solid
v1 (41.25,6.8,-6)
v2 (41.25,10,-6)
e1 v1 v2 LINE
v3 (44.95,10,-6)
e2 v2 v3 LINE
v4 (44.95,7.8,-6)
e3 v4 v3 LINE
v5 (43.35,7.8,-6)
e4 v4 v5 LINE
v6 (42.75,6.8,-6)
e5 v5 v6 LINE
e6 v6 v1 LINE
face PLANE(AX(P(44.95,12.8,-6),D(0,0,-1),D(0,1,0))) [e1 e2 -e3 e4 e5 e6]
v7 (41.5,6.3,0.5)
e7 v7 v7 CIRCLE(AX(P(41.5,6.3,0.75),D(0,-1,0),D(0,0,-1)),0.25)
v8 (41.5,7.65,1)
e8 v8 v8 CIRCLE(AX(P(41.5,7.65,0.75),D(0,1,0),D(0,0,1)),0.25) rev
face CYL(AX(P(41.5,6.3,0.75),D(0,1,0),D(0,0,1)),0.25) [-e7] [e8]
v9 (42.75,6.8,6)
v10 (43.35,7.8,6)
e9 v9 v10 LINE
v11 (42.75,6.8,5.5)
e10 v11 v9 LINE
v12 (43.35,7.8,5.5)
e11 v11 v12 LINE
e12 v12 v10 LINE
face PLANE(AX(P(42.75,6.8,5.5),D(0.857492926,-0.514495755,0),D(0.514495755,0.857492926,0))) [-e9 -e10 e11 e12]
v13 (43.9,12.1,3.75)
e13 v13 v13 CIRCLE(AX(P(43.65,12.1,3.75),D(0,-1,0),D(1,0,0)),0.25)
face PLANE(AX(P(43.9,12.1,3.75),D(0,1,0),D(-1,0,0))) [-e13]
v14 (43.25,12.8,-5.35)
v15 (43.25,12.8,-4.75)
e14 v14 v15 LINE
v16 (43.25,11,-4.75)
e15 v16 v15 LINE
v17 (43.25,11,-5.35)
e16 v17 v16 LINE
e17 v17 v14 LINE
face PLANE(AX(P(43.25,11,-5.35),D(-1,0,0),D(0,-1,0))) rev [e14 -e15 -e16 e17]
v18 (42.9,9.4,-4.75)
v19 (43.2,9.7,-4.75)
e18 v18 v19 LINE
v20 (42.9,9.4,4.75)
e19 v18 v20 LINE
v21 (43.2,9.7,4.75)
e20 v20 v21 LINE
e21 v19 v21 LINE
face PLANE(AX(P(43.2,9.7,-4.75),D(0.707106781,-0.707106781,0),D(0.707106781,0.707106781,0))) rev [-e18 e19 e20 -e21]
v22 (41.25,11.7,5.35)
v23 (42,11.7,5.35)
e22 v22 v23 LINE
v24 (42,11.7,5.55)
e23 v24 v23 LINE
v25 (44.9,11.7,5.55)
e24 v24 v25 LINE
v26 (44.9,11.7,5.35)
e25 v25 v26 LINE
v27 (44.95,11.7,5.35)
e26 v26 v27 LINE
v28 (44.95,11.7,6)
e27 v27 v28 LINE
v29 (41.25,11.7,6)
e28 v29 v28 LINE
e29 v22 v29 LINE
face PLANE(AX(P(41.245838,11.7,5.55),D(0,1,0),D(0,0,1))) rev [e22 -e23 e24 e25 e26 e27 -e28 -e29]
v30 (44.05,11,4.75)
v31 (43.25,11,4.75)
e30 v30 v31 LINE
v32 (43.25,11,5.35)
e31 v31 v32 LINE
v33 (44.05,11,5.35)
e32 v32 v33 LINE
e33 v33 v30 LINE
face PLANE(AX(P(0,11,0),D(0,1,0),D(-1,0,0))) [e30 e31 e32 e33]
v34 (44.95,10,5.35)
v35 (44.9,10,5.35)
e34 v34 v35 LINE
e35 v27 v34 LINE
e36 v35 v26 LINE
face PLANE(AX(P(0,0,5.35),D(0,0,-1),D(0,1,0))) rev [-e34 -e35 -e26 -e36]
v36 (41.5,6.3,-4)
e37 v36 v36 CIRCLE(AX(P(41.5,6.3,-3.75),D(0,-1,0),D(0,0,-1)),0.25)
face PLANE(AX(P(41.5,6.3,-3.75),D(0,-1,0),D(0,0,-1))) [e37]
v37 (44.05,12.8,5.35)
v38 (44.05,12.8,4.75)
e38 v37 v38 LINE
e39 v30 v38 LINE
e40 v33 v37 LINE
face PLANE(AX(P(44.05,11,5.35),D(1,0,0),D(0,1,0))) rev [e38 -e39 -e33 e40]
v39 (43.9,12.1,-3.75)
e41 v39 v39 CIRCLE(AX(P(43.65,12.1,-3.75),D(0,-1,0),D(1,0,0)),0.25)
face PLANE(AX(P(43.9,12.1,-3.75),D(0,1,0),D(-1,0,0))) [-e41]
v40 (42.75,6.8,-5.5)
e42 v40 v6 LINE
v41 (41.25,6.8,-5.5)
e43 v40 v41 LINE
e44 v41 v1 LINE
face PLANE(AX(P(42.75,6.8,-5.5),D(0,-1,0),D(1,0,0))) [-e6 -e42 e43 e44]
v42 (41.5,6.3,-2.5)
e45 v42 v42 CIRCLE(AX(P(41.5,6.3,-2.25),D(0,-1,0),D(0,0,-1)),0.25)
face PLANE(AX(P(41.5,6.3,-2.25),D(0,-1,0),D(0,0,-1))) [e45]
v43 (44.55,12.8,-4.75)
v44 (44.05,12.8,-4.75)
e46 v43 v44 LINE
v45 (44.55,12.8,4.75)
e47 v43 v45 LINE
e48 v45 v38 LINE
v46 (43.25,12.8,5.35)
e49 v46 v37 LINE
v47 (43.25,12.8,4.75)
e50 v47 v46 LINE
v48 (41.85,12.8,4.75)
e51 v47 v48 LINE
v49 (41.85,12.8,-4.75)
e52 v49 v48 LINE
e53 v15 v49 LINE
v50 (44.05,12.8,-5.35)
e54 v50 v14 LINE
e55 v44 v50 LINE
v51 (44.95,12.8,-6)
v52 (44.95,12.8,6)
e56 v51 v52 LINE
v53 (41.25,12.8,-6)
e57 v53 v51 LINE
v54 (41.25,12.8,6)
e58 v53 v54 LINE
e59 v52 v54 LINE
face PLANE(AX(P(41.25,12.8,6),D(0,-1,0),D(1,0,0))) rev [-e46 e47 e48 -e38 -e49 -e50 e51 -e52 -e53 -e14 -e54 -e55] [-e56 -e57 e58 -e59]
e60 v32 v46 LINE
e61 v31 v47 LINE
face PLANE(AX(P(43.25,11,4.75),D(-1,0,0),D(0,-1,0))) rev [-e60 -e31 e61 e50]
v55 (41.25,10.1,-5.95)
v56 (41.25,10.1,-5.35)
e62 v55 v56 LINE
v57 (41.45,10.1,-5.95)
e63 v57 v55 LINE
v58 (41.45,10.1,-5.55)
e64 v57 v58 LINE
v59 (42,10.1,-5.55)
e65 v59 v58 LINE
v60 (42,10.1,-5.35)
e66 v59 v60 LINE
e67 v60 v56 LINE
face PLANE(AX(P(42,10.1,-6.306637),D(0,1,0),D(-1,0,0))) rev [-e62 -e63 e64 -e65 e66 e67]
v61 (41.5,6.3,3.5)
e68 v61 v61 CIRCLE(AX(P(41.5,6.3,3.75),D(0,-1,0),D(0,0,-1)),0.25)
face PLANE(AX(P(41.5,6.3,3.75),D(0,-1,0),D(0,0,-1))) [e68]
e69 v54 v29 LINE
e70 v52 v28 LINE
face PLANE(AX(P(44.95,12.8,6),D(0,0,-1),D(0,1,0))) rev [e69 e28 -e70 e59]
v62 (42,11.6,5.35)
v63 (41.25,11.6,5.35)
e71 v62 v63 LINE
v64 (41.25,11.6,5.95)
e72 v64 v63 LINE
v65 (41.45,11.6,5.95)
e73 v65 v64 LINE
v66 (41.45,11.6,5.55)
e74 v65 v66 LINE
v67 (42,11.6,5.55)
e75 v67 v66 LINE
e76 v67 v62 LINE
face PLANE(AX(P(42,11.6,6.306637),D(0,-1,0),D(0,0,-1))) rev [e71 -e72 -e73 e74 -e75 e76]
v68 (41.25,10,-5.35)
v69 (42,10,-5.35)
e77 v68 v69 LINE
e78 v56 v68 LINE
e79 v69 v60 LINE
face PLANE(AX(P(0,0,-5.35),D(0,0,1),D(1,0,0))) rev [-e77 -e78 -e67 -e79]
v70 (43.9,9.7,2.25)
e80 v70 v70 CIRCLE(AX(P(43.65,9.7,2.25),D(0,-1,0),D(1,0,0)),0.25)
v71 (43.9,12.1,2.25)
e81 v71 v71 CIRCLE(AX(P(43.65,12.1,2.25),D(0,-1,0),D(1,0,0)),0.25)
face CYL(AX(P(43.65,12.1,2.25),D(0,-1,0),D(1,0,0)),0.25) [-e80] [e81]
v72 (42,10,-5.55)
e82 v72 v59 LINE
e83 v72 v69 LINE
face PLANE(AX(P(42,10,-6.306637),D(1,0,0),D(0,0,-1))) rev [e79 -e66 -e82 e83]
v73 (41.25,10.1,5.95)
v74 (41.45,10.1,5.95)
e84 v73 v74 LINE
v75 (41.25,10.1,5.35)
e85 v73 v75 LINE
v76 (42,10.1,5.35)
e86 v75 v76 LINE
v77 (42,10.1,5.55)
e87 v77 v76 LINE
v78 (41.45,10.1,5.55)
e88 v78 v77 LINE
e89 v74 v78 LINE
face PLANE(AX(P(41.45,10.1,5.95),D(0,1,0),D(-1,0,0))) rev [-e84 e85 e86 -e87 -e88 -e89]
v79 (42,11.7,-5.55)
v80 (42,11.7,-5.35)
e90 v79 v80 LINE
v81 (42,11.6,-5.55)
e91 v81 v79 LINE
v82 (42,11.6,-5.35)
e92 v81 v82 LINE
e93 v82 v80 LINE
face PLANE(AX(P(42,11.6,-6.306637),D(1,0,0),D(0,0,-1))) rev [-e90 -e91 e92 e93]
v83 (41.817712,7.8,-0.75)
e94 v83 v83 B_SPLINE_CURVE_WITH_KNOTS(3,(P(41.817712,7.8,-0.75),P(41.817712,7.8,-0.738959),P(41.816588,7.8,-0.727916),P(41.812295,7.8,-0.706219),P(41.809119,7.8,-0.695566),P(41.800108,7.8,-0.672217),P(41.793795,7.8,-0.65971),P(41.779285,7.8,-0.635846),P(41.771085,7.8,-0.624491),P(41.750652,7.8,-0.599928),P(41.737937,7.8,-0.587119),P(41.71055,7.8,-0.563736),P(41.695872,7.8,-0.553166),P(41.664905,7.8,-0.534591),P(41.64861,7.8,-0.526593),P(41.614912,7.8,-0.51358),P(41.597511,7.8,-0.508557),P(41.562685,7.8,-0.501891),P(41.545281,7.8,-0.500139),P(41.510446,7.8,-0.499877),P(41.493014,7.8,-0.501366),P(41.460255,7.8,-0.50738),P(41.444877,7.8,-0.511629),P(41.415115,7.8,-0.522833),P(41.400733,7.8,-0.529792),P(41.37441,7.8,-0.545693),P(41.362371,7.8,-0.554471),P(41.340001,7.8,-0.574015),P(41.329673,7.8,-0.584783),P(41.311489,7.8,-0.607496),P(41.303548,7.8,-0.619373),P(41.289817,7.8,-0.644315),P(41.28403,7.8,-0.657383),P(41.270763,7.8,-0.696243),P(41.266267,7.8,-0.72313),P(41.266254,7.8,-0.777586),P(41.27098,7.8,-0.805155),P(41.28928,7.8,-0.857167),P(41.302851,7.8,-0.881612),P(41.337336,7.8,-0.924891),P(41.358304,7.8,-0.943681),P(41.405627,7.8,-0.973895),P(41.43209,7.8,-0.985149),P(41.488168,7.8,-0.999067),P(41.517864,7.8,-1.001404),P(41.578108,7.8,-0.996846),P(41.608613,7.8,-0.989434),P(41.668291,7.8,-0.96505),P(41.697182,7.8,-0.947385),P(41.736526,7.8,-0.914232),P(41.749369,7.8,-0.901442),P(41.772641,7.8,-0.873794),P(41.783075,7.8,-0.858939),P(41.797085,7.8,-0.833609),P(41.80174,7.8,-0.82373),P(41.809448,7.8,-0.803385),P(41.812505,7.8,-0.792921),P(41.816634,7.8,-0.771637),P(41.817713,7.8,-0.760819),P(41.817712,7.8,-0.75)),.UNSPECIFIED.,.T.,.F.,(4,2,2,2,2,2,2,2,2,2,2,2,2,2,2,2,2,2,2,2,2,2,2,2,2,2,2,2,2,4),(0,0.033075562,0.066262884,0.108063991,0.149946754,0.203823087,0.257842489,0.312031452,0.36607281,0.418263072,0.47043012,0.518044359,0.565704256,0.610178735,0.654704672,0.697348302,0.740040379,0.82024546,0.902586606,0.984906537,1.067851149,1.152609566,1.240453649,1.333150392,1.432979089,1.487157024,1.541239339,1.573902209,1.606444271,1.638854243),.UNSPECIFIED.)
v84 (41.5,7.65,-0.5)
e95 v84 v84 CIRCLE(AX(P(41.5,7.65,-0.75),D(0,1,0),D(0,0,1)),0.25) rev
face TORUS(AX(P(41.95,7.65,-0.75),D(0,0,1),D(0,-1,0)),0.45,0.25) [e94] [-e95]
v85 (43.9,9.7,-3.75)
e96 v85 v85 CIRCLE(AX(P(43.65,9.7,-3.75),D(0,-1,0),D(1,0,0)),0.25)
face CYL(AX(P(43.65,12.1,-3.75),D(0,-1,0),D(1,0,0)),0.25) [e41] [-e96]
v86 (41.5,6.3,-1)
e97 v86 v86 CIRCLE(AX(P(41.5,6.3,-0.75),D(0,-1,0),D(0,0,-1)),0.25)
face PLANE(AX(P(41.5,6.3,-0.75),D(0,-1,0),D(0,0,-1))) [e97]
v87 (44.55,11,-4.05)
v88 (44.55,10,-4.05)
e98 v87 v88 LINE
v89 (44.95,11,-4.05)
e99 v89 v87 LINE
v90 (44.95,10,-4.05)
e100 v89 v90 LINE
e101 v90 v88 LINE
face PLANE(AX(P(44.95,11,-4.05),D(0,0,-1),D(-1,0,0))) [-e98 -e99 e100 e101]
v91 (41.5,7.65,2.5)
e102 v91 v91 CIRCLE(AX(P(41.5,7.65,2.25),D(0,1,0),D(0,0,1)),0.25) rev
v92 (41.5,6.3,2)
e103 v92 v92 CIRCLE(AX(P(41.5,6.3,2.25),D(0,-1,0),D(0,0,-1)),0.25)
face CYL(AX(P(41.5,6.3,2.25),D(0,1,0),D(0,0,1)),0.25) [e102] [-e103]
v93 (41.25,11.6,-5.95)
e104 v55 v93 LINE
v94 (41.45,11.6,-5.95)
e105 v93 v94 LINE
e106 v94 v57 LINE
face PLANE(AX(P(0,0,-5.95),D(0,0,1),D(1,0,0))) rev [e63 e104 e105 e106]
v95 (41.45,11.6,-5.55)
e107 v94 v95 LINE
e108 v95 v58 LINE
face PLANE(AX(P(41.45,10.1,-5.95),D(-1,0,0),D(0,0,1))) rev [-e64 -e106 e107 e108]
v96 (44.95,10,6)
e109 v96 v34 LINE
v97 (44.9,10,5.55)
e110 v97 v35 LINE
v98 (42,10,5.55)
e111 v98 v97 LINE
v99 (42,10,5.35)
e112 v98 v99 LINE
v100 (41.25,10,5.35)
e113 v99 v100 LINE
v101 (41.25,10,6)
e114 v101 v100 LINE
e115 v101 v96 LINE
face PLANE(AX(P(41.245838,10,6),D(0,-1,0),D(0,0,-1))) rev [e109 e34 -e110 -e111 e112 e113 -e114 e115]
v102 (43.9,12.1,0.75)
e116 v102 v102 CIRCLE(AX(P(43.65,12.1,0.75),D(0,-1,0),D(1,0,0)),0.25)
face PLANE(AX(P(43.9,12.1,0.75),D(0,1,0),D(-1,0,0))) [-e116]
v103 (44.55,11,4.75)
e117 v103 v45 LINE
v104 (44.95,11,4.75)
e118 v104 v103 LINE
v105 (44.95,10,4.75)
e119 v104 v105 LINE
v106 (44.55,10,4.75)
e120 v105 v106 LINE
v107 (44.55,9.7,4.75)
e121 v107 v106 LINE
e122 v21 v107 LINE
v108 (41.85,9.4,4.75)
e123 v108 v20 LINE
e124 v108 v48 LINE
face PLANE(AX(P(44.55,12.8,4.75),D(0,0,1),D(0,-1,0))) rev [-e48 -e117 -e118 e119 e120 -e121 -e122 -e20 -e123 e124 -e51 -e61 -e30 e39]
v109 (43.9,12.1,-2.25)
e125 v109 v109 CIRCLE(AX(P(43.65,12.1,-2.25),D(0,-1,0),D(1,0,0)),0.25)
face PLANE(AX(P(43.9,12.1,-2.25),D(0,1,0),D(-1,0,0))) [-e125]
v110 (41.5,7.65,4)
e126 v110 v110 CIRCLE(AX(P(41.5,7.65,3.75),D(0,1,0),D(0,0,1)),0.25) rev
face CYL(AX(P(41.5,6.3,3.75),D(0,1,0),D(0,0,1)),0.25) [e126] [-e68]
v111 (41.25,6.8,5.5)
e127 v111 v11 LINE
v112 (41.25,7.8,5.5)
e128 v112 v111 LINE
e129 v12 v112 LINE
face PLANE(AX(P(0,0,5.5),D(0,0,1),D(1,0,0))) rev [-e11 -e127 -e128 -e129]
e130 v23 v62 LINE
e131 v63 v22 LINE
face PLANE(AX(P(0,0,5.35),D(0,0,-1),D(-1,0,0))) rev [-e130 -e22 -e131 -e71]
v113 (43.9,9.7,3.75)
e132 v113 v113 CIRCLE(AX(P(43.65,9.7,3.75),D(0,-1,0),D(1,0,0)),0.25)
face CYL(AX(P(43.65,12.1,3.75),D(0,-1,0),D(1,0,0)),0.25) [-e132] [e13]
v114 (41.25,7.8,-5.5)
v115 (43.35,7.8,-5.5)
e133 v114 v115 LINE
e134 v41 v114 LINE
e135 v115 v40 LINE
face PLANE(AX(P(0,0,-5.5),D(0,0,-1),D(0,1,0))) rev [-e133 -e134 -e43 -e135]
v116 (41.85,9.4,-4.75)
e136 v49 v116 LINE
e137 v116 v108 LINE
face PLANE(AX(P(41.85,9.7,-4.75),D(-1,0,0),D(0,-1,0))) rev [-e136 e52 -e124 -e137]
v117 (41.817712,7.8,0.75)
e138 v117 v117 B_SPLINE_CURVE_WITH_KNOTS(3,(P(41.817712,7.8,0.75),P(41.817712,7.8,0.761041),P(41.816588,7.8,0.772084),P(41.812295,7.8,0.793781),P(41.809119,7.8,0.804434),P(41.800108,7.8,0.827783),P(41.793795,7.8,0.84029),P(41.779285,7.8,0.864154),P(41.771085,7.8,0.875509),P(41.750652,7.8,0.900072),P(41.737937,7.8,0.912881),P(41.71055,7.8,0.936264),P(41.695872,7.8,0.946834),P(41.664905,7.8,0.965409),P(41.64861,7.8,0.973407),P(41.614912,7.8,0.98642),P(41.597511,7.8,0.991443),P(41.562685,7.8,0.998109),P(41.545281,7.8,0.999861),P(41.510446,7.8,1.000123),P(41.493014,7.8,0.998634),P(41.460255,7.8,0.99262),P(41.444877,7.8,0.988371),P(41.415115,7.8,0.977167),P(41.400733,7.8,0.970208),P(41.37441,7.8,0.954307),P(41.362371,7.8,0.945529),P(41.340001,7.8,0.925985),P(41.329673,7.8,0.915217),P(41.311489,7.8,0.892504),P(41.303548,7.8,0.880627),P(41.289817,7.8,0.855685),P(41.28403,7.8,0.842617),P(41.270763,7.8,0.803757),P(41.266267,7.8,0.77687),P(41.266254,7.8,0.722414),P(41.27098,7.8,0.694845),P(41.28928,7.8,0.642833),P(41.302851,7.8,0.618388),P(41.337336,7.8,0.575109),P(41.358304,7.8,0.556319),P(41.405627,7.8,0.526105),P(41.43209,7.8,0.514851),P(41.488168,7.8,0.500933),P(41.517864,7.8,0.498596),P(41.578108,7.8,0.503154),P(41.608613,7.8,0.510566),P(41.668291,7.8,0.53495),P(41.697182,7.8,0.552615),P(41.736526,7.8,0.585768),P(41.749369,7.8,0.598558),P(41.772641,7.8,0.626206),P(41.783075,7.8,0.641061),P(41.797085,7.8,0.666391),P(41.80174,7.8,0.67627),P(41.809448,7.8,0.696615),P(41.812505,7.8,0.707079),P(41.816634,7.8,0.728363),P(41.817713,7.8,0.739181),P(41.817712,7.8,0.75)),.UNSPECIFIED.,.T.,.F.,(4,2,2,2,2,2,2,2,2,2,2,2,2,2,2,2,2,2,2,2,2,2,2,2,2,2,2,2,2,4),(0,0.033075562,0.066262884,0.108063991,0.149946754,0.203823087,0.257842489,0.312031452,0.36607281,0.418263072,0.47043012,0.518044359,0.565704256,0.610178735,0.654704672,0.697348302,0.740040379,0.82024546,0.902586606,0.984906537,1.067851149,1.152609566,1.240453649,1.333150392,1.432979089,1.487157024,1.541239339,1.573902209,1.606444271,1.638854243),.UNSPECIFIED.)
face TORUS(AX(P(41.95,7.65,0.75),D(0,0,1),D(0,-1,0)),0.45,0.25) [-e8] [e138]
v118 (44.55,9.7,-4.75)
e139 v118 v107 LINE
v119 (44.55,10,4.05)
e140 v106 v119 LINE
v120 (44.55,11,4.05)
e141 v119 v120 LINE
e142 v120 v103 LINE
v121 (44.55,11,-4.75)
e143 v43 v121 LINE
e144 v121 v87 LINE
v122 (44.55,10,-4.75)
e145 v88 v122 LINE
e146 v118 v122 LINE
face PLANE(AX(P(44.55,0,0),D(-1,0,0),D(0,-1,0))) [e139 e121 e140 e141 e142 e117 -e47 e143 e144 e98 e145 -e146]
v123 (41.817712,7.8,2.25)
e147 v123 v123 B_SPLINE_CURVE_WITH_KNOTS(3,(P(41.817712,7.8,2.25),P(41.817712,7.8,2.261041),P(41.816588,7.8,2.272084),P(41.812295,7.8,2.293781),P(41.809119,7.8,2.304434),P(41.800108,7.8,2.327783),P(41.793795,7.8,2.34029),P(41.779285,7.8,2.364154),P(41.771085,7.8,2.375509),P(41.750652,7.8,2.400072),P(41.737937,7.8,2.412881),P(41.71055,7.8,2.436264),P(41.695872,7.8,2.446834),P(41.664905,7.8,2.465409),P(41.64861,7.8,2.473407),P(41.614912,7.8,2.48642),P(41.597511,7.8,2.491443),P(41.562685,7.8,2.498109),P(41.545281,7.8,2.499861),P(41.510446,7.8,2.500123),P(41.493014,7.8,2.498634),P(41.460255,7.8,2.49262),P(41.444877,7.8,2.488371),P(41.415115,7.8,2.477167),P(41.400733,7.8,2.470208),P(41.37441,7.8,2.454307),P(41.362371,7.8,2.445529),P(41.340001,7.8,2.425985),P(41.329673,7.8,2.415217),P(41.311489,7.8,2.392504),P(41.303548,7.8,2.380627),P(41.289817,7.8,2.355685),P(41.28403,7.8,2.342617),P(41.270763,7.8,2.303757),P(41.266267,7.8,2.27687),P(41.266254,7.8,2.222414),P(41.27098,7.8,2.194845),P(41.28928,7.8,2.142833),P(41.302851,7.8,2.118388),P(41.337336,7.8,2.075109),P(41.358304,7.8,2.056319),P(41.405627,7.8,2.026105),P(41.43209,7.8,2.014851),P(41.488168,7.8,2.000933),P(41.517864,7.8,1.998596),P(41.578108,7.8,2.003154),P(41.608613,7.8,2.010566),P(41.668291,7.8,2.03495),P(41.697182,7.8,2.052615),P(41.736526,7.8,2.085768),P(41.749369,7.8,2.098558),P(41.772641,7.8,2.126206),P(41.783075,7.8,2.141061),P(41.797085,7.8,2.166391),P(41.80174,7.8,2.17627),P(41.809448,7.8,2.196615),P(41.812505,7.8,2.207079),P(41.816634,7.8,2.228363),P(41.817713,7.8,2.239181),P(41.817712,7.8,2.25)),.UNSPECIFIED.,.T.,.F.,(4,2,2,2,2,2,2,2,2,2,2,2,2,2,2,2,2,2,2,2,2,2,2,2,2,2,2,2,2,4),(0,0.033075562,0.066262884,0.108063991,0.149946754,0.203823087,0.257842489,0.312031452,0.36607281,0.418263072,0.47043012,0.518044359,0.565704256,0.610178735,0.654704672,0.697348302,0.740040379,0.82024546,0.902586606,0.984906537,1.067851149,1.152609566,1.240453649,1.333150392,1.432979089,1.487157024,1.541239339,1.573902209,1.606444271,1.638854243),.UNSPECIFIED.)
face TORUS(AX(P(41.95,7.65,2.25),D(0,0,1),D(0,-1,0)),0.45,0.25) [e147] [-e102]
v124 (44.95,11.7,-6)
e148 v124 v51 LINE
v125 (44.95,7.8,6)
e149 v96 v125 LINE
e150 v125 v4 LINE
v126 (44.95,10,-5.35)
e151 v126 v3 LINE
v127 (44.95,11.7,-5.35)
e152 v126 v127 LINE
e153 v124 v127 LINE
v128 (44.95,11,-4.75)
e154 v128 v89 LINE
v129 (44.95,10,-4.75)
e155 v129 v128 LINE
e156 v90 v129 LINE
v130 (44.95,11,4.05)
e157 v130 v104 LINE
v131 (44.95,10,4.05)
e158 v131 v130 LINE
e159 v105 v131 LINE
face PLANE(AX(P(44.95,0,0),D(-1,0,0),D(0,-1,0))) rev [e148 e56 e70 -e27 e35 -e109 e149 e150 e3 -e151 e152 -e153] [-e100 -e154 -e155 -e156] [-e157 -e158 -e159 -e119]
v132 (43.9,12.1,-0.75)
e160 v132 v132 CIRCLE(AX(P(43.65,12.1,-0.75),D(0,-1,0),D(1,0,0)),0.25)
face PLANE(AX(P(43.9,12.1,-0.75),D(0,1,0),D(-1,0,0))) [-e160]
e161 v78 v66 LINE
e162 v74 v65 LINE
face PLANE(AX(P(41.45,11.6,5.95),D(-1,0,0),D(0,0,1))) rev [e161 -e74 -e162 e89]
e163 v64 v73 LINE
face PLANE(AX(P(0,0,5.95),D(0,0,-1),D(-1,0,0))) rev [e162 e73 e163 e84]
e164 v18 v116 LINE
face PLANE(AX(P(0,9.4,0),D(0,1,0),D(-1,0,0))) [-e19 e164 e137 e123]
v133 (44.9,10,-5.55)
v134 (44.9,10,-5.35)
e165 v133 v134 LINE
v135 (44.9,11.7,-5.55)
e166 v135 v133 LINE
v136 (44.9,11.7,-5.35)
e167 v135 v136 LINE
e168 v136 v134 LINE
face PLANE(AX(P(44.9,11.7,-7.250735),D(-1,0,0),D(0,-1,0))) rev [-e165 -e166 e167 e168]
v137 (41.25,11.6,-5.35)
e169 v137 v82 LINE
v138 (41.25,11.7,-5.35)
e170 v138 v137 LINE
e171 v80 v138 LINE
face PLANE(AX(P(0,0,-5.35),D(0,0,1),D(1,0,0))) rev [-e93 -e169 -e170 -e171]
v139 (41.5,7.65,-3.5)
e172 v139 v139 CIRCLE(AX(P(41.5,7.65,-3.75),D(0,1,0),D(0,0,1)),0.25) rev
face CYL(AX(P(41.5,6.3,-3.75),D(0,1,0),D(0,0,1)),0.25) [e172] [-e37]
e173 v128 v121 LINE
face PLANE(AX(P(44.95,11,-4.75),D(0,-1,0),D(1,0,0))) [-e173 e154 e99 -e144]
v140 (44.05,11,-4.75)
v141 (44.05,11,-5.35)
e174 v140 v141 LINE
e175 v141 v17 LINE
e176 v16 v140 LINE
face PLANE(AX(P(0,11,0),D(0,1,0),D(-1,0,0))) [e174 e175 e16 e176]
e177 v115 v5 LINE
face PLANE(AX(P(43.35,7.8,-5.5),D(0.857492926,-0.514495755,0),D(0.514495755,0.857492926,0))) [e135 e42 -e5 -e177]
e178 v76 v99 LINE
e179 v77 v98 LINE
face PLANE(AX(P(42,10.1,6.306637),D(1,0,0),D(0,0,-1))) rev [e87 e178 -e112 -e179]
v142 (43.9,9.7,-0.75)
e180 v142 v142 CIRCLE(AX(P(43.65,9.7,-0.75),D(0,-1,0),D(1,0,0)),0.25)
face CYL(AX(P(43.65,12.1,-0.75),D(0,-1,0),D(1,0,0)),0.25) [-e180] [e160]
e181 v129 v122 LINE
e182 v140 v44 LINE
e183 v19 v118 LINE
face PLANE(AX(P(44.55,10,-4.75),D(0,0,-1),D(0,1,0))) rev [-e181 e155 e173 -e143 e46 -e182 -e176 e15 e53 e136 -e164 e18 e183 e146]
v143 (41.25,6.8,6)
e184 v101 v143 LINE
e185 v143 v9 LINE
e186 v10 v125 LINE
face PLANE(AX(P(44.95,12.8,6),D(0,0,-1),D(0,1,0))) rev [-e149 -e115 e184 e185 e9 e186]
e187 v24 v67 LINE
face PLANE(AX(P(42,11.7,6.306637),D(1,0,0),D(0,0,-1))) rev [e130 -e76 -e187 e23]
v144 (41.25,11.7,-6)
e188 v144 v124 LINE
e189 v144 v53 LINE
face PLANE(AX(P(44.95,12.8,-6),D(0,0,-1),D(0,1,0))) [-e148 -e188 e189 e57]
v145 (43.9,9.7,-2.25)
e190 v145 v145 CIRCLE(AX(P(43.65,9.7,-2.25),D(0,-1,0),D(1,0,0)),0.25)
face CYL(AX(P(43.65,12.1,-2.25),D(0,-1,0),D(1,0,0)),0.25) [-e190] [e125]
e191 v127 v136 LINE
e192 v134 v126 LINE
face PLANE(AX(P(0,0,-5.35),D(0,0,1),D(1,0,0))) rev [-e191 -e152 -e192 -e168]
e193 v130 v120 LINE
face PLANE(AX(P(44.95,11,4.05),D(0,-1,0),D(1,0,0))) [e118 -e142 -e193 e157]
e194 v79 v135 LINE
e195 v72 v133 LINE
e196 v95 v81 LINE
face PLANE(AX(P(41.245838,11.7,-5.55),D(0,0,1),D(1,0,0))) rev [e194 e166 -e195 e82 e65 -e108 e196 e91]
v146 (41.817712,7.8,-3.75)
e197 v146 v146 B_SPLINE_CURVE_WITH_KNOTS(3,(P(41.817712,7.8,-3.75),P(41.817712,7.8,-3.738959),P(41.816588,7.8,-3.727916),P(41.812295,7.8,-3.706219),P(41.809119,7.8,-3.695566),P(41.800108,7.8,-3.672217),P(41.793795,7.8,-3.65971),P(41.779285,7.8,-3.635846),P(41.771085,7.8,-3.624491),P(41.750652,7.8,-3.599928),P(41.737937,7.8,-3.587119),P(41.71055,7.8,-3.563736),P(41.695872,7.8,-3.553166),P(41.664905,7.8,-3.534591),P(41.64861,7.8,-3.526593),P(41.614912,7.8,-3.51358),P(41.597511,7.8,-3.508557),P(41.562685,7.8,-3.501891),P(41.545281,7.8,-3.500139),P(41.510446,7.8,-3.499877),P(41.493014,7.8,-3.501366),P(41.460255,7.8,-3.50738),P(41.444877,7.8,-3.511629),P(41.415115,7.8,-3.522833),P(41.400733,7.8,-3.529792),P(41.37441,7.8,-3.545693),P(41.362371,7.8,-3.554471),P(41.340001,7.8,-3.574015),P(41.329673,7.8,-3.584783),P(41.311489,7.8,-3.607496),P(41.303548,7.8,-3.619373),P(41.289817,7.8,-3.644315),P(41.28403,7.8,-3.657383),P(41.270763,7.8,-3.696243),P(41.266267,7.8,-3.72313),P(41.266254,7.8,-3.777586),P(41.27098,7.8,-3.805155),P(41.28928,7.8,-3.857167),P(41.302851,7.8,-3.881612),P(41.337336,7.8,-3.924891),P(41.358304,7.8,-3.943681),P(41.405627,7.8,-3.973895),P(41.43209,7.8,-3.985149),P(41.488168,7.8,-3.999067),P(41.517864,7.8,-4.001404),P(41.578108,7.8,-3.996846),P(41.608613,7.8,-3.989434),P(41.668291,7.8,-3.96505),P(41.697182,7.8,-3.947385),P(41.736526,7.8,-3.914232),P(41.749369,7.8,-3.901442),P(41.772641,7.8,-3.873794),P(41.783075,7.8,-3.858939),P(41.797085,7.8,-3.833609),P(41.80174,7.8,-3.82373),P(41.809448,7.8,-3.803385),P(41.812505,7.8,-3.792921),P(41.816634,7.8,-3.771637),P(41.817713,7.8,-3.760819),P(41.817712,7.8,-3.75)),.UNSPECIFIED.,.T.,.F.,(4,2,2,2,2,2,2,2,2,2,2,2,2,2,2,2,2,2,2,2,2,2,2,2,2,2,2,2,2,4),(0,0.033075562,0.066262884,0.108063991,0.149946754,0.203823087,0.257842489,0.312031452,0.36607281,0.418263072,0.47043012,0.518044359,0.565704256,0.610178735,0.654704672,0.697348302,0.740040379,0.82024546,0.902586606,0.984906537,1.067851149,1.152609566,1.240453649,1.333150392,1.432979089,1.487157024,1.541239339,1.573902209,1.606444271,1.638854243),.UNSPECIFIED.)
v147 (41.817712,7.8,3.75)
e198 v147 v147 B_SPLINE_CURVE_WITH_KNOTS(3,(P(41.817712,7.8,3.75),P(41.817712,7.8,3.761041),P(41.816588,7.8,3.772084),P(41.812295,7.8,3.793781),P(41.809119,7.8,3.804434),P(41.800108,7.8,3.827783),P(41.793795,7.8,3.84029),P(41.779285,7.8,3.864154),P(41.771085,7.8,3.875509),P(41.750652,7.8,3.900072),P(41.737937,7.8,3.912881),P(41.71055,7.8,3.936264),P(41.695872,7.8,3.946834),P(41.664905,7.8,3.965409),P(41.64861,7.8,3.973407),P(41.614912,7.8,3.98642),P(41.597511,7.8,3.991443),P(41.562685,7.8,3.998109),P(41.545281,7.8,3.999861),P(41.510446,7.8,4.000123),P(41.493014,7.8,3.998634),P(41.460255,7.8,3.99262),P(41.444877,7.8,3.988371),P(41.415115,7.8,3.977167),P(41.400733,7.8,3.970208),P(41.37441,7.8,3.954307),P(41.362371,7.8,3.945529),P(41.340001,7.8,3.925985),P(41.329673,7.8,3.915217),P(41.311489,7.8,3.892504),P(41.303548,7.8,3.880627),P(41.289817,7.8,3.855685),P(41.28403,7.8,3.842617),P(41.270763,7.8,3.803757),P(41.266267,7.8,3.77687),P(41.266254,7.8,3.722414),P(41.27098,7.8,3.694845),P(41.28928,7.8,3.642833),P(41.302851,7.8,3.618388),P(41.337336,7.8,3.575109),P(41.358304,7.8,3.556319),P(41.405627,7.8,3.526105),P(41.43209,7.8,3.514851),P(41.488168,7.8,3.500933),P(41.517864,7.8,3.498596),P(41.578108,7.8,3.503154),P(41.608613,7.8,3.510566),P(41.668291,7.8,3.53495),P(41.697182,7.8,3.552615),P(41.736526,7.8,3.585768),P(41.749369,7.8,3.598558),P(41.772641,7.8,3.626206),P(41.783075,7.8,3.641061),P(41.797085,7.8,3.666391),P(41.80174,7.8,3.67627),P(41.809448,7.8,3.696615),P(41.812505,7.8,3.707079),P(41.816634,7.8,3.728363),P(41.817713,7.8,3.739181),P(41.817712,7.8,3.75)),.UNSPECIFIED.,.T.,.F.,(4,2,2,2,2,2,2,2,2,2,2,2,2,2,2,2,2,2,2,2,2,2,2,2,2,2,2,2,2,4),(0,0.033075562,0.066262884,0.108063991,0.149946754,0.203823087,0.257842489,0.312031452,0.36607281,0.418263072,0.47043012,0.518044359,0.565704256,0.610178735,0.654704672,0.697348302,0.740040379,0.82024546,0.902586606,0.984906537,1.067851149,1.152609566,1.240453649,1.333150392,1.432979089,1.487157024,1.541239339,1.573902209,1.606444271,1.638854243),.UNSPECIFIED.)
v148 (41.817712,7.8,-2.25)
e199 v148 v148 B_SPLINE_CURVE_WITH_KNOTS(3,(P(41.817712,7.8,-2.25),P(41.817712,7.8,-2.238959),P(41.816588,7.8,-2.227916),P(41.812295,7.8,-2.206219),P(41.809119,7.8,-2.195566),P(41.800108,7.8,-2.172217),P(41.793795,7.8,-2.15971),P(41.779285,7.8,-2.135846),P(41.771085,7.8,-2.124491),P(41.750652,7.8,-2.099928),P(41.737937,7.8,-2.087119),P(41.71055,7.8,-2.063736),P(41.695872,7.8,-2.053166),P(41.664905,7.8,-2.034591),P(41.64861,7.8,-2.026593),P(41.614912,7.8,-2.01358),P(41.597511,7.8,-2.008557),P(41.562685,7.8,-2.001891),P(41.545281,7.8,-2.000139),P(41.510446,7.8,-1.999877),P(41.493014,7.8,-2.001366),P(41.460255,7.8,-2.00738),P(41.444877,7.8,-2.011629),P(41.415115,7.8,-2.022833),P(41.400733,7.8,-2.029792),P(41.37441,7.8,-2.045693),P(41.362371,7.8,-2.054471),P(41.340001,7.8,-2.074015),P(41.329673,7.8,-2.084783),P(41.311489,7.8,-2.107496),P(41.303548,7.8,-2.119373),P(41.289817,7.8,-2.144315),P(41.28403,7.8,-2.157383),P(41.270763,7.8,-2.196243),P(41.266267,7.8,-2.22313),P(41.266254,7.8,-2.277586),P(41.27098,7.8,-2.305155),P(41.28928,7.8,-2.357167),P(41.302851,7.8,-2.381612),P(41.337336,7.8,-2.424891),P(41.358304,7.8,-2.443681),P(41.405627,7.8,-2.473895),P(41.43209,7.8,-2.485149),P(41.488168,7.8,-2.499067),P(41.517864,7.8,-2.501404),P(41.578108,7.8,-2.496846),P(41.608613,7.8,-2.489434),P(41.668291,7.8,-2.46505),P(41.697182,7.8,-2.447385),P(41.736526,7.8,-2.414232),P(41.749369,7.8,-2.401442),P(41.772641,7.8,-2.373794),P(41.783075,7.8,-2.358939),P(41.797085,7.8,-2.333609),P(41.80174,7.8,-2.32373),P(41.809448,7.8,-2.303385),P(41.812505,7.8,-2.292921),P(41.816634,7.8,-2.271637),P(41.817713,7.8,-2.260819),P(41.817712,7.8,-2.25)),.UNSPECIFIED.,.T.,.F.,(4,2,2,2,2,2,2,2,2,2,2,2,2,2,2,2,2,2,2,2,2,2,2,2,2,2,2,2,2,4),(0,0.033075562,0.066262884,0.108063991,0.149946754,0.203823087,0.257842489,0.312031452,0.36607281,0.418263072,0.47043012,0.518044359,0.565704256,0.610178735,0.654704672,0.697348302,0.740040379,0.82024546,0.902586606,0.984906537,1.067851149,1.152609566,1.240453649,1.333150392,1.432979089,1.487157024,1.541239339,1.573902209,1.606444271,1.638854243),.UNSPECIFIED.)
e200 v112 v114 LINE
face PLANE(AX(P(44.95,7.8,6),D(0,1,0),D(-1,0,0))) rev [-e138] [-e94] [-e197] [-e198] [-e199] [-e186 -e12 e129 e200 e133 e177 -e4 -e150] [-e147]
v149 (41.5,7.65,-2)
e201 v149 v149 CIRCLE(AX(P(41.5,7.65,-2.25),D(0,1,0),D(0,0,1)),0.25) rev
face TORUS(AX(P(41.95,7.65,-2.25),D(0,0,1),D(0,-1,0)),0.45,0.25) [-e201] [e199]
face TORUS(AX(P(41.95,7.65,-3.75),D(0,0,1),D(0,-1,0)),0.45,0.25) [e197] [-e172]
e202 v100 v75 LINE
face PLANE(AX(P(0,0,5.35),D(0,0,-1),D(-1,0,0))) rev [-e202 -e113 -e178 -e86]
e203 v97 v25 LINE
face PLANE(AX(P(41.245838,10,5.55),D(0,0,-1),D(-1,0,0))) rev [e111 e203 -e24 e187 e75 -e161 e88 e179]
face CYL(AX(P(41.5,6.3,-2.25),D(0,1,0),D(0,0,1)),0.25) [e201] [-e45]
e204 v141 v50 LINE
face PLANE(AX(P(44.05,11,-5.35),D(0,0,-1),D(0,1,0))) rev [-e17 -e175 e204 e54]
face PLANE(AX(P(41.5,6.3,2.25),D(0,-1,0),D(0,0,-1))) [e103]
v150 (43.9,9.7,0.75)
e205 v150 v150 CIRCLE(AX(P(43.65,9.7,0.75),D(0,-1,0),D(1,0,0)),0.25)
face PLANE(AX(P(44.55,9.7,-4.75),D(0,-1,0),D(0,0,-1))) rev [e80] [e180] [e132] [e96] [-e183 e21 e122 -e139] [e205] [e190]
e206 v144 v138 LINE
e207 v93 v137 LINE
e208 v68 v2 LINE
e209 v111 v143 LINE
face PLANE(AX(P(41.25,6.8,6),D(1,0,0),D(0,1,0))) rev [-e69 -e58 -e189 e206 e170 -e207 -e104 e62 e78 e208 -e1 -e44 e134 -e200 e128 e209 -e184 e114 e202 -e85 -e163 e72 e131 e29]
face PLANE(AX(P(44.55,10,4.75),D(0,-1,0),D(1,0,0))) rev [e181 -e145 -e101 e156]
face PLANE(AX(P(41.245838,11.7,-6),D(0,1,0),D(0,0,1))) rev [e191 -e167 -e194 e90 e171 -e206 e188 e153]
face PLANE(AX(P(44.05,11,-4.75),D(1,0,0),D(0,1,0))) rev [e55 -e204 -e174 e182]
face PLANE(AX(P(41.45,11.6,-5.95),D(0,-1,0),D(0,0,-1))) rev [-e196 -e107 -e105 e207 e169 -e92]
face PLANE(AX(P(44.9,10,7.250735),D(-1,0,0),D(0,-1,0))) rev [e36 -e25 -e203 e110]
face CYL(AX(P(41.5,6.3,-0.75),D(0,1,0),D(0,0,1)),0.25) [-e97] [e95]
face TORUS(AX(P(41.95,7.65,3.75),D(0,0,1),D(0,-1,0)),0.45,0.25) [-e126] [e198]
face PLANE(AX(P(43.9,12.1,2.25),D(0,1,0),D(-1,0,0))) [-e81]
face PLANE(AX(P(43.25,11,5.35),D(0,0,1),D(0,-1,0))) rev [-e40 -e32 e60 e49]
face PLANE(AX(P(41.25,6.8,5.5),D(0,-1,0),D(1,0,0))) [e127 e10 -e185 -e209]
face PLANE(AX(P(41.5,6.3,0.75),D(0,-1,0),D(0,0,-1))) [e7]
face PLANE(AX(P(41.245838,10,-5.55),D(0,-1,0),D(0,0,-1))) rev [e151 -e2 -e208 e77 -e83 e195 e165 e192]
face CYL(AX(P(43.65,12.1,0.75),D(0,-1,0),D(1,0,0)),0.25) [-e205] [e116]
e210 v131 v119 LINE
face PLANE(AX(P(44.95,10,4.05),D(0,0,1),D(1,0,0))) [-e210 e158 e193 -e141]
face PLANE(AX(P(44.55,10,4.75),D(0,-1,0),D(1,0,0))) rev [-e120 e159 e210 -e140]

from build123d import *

# Parameters (mm, degrees)
BOSS_EXTRUDE1_START       = -0.6
BOSS_EXTRUDE1_DEPTH       = 3.3
BOSS_EXTRUDE1_2_OUTLINE_W = 9.5
BOSS_EXTRUDE1_2_OUTLINE_H = 2.8
BOSS_EXTRUDE1_2_DEPTH     = 0.6
BOSS_EXTRUDE1_3_OUTLINE_R = 0.25
BOSS_EXTRUDE1_3_ANGLE     = 48.590678
SKETCH2_W                 = 12
SKETCH2_H                 = 5
SKETCH2_W_2               = 0.7
SKETCH2_H_2               = 1
BOSS_EXTRUDE2_DEPTH       = 0.4
SKETCH3_W                 = 2.7
SKETCH3_H                 = 9.5
CUT_EXTRUDE1_DEPTH        = 0.6
SKETCH4_W                 = 0.45
SKETCH4_H                 = 1.7
CUT_EXTRUDE2_DEPTH        = 15.612665805
CUT_EXTRUDE3_REACH        = 50.095
SKETCH6_W                 = 0.05
SKETCH6_H                 = 1.7
SKETCH7_W                 = 0.45
SKETCH7_H                 = 1.7
CUT_EXTRUDE4_DEPTH        = 15.612665805
CUT_EXTRUDE5_REACH        = 50.095
SKETCH9_W                 = 0.05
SKETCH9_H                 = 1.7
CUT_EXTRUDE6_REACH        = 50.095
SKETCH11_W                = 0.75
SKETCH11_H                = 0.1
SKETCH12_W                = 0.2
SKETCH12_H                = 1.5
BOSS_EXTRUDE3_DEPTH       = 0.4
CUT_EXTRUDE7_REACH        = 50.095
SKETCH14_W                = 0.75
SKETCH14_H                = 0.1
CUT_EXTRUDE8_REACH        = 50.095
SKETCH16_W                = 0.75
SKETCH16_H                = 0.1
SKETCH17_W                = 0.2
SKETCH17_H                = 1.5
BOSS_EXTRUDE4_DEPTH       = 0.4
CUT_EXTRUDE9_REACH        = 50.095
SKETCH19_W                = 0.75
SKETCH19_H                = 0.1
BOSS_EXTRUDE5_DEPTH       = 9.5
SKETCH21_W                = 0.8
SKETCH21_H                = 0.6
CUT_EXTRUDE10_DEPTH       = 1.8
SKETCH22_W                = 0.8
SKETCH22_H                = 0.6
CUT_EXTRUDE11_DEPTH       = 1.8
SKETCH23_R                = 0.25
BOSS_EXTRUDE6_DEPTH       = 1.35
SKETCH24_R                = 0.25
BOSS_EXTRUDE7_DEPTH       = 1.35
SKETCH25_R                = 0.25
BOSS_EXTRUDE8_DEPTH       = 1.35
SKETCH26_R                = 0.25
BOSS_EXTRUDE9_DEPTH       = 1.35
SKETCH27_R                = 0.25
BOSS_EXTRUDE10_DEPTH      = 1.35
BOSS_EXTRUDE11_DEPTH      = 0.5
BOSS_EXTRUDE12_DEPTH      = 0.5
SKETCH30_R                = 0.25
BOSS_EXTRUDE13_DEPTH      = 1.35
SKETCH31_W                = 0.25
SKETCH31_H                = 2.4
SKETCH32_W                = 0.25
SKETCH32_H                = 2.4
SKETCH33_W                = 0.25
SKETCH33_H                = 2.4
SKETCH34_W                = 0.25
SKETCH34_H                = 2.4
SKETCH35_W                = 0.25
SKETCH35_H                = 2.4
SKETCH36_W                = 0.25
SKETCH36_H                = 2.4


with BuildPart() as part:
    # Boss-Extrude1: read off the stored shape, not the designer's step
    # Boss-Extrude1 outline → Boss-Extrude1 (new body)
    with BuildSketch(Plane(origin=(41.85, 0, 0), x_dir=(0, 0, -1), z_dir=(1, 0, 0)).offset(BOSS_EXTRUDE1_START)):
        Polygon((-4.75, 12.8), (-6, 12.8), (-6, 7.8), (6, 7.8), (6, 12.8), (4.75, 12.8), (4.75, 10), (-4.75, 10), align=None)
    extrude(amount=BOSS_EXTRUDE1_DEPTH)

    # Boss-Extrude1 2 outline → Boss-Extrude1 2 (add)
    with BuildSketch(Plane(origin=(41.85, 0, 0), x_dir=(0, 0, -1), z_dir=(1, 0, 0)).offset(BOSS_EXTRUDE1_START)):
        with Locations((0, 11.4)):
            Rectangle(BOSS_EXTRUDE1_2_OUTLINE_W, BOSS_EXTRUDE1_2_OUTLINE_H)
    extrude(amount=BOSS_EXTRUDE1_2_DEPTH)

    # Boss-Extrude1 3 outline → Boss-Extrude1 3 (revolve)
    with BuildSketch(Plane(origin=(41.95, 7.65, 0), x_dir=(-0.6614338946121362, 0.7500034686974597, 0), z_dir=(0.7500034686974597, 0.6614338946121362, 0))):
        with Locations((0.45, 2.25)):
            Circle(BOSS_EXTRUDE1_3_OUTLINE_R)
        with Locations((0.45, -2.25)):
            Circle(BOSS_EXTRUDE1_3_OUTLINE_R)
        with Locations((0.45, -0.75)):
            Circle(BOSS_EXTRUDE1_3_OUTLINE_R)
        with Locations((0.45, 0.75)):
            Circle(BOSS_EXTRUDE1_3_OUTLINE_R)
        with Locations((0.45, 3.75)):
            Circle(BOSS_EXTRUDE1_3_OUTLINE_R)
        with Locations((0.45, -3.75)):
            Circle(BOSS_EXTRUDE1_3_OUTLINE_R)
    revolve(axis=Axis((41.95, 7.65, 0), (0, 0, 1)), revolution_arc=BOSS_EXTRUDE1_3_ANGLE)

    # Sketch2 → Boss-Extrude2 (add)
    with BuildSketch(Plane(origin=(44.55, 0, 0), x_dir=(0, 0, -1), z_dir=(1, 0, 0))):
        with Locations((0, 10.3)):
            Rectangle(SKETCH2_W, SKETCH2_H)
        with Locations((4.4, 10.5)):
            Rectangle(SKETCH2_W_2, SKETCH2_H_2, mode=Mode.SUBTRACT)
        with Locations((-4.4, 10.5)):
            Rectangle(SKETCH2_W_2, SKETCH2_H_2, mode=Mode.SUBTRACT)
    extrude(amount=BOSS_EXTRUDE2_DEPTH)

    # Sketch3 → Cut-Extrude1 (cut)
    with BuildSketch(Plane(origin=(0, 10, 0), x_dir=(-1, 0, 0), z_dir=(0, 1, 0))):
        with Locations((-43.2, 0)):
            Rectangle(SKETCH3_W, SKETCH3_H)
    extrude(amount=-CUT_EXTRUDE1_DEPTH, mode=Mode.SUBTRACT)

    # Sketch4 → Cut-Extrude2 (cut, through all)
    with BuildSketch(Plane(origin=(44.95, 0, 0), x_dir=(0, 0, -1), z_dir=(1, 0, 0))):
        with Locations((-5.775, 10.85)):
            Rectangle(SKETCH4_W, SKETCH4_H)
    extrude(amount=-CUT_EXTRUDE2_DEPTH, mode=Mode.SUBTRACT)

    # Sketch6 → Cut-Extrude3 (cut, up to next)
    with BuildSketch(Plane(origin=(0, 0, 5.35), x_dir=(-1, 0, 0), z_dir=(0, 0, -1)), mode=Mode.PRIVATE) as cut_extrude3_sk1:
        with Locations((-44.925, 10.85)):
            Rectangle(SKETCH6_W, SKETCH6_H)
    cut_extrude3_tool1 = extrude(cut_extrude3_sk1.sketch, amount=-CUT_EXTRUDE3_REACH, mode=Mode.PRIVATE) & part.part
    add(cut_extrude3_tool1.solids().sort_by_distance((44.925, 10.85, 5.35))[0], mode=Mode.SUBTRACT)

    # Sketch7 → Cut-Extrude4 (cut, through all)
    with BuildSketch(Plane(origin=(44.95, 0, 0), x_dir=(0, 0, -1), z_dir=(1, 0, 0))):
        with Locations((5.775, 10.85)):
            Rectangle(SKETCH7_W, SKETCH7_H)
    extrude(amount=-CUT_EXTRUDE4_DEPTH, mode=Mode.SUBTRACT)

    # Sketch9 → Cut-Extrude5 (cut, up to next)
    with BuildSketch(Plane.XY.offset(-5.35), mode=Mode.PRIVATE) as cut_extrude5_sk1:
        with Locations((44.925, 10.85)):
            Rectangle(SKETCH9_W, SKETCH9_H)
    cut_extrude5_tool1 = extrude(cut_extrude5_sk1.sketch, amount=-CUT_EXTRUDE5_REACH, mode=Mode.PRIVATE) & part.part
    add(cut_extrude5_tool1.solids().sort_by_distance((44.925, 10.85, -5.35))[0], mode=Mode.SUBTRACT)

    # Sketch11 → Cut-Extrude6 (cut, up to next)
    with BuildSketch(Plane.XY.offset(-5.35), mode=Mode.PRIVATE) as cut_extrude6_sk1:
        with Locations((41.625, 10.05)):
            Rectangle(SKETCH11_W, SKETCH11_H)
    cut_extrude6_tool1 = extrude(cut_extrude6_sk1.sketch, amount=-CUT_EXTRUDE6_REACH, mode=Mode.PRIVATE) & part.part
    add(cut_extrude6_tool1.solids().sort_by_distance((41.625, 10.05, -5.35))[0], mode=Mode.SUBTRACT)

    # Sketch12 → Boss-Extrude3 (add)
    with BuildSketch(Plane(origin=(0, 0, -5.55), x_dir=(-1, 0, 0), z_dir=(0, 0, -1))):
        with Locations((-41.35, 10.85)):
            Rectangle(SKETCH12_W, SKETCH12_H)
    extrude(amount=BOSS_EXTRUDE3_DEPTH)

    # Sketch14 → Cut-Extrude7 (cut, up to next)
    with BuildSketch(Plane.XY.offset(-5.35), mode=Mode.PRIVATE) as cut_extrude7_sk1:
        with Locations((41.625, 11.65)):
            Rectangle(SKETCH14_W, SKETCH14_H)
    cut_extrude7_tool1 = extrude(cut_extrude7_sk1.sketch, amount=-CUT_EXTRUDE7_REACH, mode=Mode.PRIVATE) & part.part
    add(cut_extrude7_tool1.solids().sort_by_distance((41.625, 11.65, -5.35))[0], mode=Mode.SUBTRACT)

    # Sketch16 → Cut-Extrude8 (cut, up to next)
    with BuildSketch(Plane(origin=(0, 0, 5.35), x_dir=(-1, 0, 0), z_dir=(0, 0, -1)), mode=Mode.PRIVATE) as cut_extrude8_sk1:
        with Locations((-41.625, 11.65)):
            Rectangle(SKETCH16_W, SKETCH16_H)
    cut_extrude8_tool1 = extrude(cut_extrude8_sk1.sketch, amount=-CUT_EXTRUDE8_REACH, mode=Mode.PRIVATE) & part.part
    add(cut_extrude8_tool1.solids().sort_by_distance((41.625, 11.65, 5.35))[0], mode=Mode.SUBTRACT)

    # Sketch17 → Boss-Extrude4 (add)
    with BuildSketch(Plane.XY.offset(5.55)):
        with Locations((41.35, 10.85)):
            Rectangle(SKETCH17_W, SKETCH17_H)
    extrude(amount=BOSS_EXTRUDE4_DEPTH)

    # Sketch19 → Cut-Extrude9 (cut, up to next)
    with BuildSketch(Plane(origin=(0, 0, 5.35), x_dir=(-1, 0, 0), z_dir=(0, 0, -1)), mode=Mode.PRIVATE) as cut_extrude9_sk1:
        with Locations((-41.625, 10.05)):
            Rectangle(SKETCH19_W, SKETCH19_H)
    cut_extrude9_tool1 = extrude(cut_extrude9_sk1.sketch, amount=-CUT_EXTRUDE9_REACH, mode=Mode.PRIVATE) & part.part
    add(cut_extrude9_tool1.solids().sort_by_distance((41.625, 10.05, 5.35))[0], mode=Mode.SUBTRACT)

    # Sketch20 → Boss-Extrude5 (add)
    with BuildSketch(Plane(origin=(0, 0, 4.75), x_dir=(-1, 0, 0), z_dir=(0, 0, -1))):
        Polygon((-42.9, 9.4), (-44.55, 9.4), (-44.55, 9.7), (-43.2, 9.7), align=None)
    extrude(amount=BOSS_EXTRUDE5_DEPTH)

    # Sketch21 → Cut-Extrude10 (cut)
    with BuildSketch(Plane(origin=(0, 12.8, 0), x_dir=(-1, 0, 0), z_dir=(0, 1, 0))):
        with Locations((-43.65, -5.05)):
            Rectangle(SKETCH21_W, SKETCH21_H)
    extrude(amount=-CUT_EXTRUDE10_DEPTH, mode=Mode.SUBTRACT)

    # Sketch22 → Cut-Extrude11 (cut)
    with BuildSketch(Plane(origin=(0, 12.8, 0), x_dir=(-1, 0, 0), z_dir=(0, 1, 0))):
        with Locations((-43.65, 5.05)):
            Rectangle(SKETCH22_W, SKETCH22_H)
    extrude(amount=-CUT_EXTRUDE11_DEPTH, mode=Mode.SUBTRACT)

    # Sketch23 → Boss-Extrude6 (add)
    with BuildSketch(Plane.XZ.offset(-7.65)):
        with Locations(Location((41.5, 2.25, 0), (0, 0, 90))):
            Circle(SKETCH23_R)
    extrude(amount=BOSS_EXTRUDE6_DEPTH)

    # Sketch24 → Boss-Extrude7 (add)
    with BuildSketch(Plane.XZ.offset(-7.65)):
        with Locations(Location((41.5, -0.75, 0), (0, 0, 90))):
            Circle(SKETCH24_R)
    extrude(amount=BOSS_EXTRUDE7_DEPTH)

    # Sketch25 → Boss-Extrude8 (add)
    with BuildSketch(Plane.XZ.offset(-7.65)):
        with Locations(Location((41.5, -3.75, 0), (0, 0, 90))):
            Circle(SKETCH25_R)
    extrude(amount=BOSS_EXTRUDE8_DEPTH)

    # Sketch26 → Boss-Extrude9 (add)
    with BuildSketch(Plane.XZ.offset(-7.65)):
        with Locations(Location((41.5, -2.25, 0), (0, 0, 90))):
            Circle(SKETCH26_R)
    extrude(amount=BOSS_EXTRUDE9_DEPTH)

    # Sketch27 → Boss-Extrude10 (add)
    with BuildSketch(Plane.XZ.offset(-7.65)):
        with Locations(Location((41.5, 0.75, 0), (0, 0, 90))):
            Circle(SKETCH27_R)
    extrude(amount=BOSS_EXTRUDE10_DEPTH)

    # Sketch28 → Boss-Extrude11 (add)
    with BuildSketch(Plane.XY.offset(6)):
        Polygon((43.35, 7.8), (41.25, 7.8), (41.25, 6.8), (42.75, 6.8), align=None)
    extrude(amount=-BOSS_EXTRUDE11_DEPTH)

    # Sketch29 → Boss-Extrude12 (add)
    with BuildSketch(Plane(origin=(0, 0, -6), x_dir=(-1, 0, 0), z_dir=(0, 0, -1))):
        Polygon((-41.25, 6.8), (-41.25, 7.8), (-43.35, 7.8), (-42.75, 6.8), align=None)
    extrude(amount=-BOSS_EXTRUDE12_DEPTH)

    # Sketch30 → Boss-Extrude13 (add)
    with BuildSketch(Plane.XZ.offset(-7.65)):
        with Locations(Location((41.5, 3.75, 0), (0, 0, 90))):
            Circle(SKETCH30_R)
    extrude(amount=BOSS_EXTRUDE13_DEPTH)

    # Sketch31 → Revolve1 (revolve)
    with BuildSketch(Plane.XY.offset(3.75)):
        with Locations((43.775, 10.9)):
            Rectangle(SKETCH31_W, SKETCH31_H)
    revolve(axis=Axis((43.65, 12.1, 3.75), (0, -1, 0)))

    # Sketch32 → Revolve2 (revolve)
    with BuildSketch(Plane.XY.offset(0.75)):
        with Locations((43.775, 10.9)):
            Rectangle(SKETCH32_W, SKETCH32_H)
    revolve(axis=Axis((43.65, 12.1, 0.75), (0, -1, 0)))

    # Sketch33 → Revolve3 (revolve)
    with BuildSketch(Plane.XY.offset(-2.25)):
        with Locations((43.775, 10.9)):
            Rectangle(SKETCH33_W, SKETCH33_H)
    revolve(axis=Axis((43.65, 12.1, -2.25), (0, -1, 0)))

    # Sketch34 → Revolve4 (revolve)
    with BuildSketch(Plane.XY.offset(-3.75)):
        with Locations((43.775, 10.9)):
            Rectangle(SKETCH34_W, SKETCH34_H)
    revolve(axis=Axis((43.65, 12.1, -3.75), (0, -1, 0)))

    # Sketch35 → Revolve5 (revolve)
    with BuildSketch(Plane.XY.offset(-0.75)):
        with Locations((43.775, 10.9)):
            Rectangle(SKETCH35_W, SKETCH35_H)
    revolve(axis=Axis((43.65, 12.1, -0.75), (0, -1, 0)))

    # Sketch36 → Revolve6 (revolve)
    with BuildSketch(Plane.XY.offset(2.25)):
        with Locations((43.775, 10.9)):
            Rectangle(SKETCH36_W, SKETCH36_H)
    revolve(axis=Axis((43.65, 12.1, 2.25), (0, -1, 0)))


solid = part.part
